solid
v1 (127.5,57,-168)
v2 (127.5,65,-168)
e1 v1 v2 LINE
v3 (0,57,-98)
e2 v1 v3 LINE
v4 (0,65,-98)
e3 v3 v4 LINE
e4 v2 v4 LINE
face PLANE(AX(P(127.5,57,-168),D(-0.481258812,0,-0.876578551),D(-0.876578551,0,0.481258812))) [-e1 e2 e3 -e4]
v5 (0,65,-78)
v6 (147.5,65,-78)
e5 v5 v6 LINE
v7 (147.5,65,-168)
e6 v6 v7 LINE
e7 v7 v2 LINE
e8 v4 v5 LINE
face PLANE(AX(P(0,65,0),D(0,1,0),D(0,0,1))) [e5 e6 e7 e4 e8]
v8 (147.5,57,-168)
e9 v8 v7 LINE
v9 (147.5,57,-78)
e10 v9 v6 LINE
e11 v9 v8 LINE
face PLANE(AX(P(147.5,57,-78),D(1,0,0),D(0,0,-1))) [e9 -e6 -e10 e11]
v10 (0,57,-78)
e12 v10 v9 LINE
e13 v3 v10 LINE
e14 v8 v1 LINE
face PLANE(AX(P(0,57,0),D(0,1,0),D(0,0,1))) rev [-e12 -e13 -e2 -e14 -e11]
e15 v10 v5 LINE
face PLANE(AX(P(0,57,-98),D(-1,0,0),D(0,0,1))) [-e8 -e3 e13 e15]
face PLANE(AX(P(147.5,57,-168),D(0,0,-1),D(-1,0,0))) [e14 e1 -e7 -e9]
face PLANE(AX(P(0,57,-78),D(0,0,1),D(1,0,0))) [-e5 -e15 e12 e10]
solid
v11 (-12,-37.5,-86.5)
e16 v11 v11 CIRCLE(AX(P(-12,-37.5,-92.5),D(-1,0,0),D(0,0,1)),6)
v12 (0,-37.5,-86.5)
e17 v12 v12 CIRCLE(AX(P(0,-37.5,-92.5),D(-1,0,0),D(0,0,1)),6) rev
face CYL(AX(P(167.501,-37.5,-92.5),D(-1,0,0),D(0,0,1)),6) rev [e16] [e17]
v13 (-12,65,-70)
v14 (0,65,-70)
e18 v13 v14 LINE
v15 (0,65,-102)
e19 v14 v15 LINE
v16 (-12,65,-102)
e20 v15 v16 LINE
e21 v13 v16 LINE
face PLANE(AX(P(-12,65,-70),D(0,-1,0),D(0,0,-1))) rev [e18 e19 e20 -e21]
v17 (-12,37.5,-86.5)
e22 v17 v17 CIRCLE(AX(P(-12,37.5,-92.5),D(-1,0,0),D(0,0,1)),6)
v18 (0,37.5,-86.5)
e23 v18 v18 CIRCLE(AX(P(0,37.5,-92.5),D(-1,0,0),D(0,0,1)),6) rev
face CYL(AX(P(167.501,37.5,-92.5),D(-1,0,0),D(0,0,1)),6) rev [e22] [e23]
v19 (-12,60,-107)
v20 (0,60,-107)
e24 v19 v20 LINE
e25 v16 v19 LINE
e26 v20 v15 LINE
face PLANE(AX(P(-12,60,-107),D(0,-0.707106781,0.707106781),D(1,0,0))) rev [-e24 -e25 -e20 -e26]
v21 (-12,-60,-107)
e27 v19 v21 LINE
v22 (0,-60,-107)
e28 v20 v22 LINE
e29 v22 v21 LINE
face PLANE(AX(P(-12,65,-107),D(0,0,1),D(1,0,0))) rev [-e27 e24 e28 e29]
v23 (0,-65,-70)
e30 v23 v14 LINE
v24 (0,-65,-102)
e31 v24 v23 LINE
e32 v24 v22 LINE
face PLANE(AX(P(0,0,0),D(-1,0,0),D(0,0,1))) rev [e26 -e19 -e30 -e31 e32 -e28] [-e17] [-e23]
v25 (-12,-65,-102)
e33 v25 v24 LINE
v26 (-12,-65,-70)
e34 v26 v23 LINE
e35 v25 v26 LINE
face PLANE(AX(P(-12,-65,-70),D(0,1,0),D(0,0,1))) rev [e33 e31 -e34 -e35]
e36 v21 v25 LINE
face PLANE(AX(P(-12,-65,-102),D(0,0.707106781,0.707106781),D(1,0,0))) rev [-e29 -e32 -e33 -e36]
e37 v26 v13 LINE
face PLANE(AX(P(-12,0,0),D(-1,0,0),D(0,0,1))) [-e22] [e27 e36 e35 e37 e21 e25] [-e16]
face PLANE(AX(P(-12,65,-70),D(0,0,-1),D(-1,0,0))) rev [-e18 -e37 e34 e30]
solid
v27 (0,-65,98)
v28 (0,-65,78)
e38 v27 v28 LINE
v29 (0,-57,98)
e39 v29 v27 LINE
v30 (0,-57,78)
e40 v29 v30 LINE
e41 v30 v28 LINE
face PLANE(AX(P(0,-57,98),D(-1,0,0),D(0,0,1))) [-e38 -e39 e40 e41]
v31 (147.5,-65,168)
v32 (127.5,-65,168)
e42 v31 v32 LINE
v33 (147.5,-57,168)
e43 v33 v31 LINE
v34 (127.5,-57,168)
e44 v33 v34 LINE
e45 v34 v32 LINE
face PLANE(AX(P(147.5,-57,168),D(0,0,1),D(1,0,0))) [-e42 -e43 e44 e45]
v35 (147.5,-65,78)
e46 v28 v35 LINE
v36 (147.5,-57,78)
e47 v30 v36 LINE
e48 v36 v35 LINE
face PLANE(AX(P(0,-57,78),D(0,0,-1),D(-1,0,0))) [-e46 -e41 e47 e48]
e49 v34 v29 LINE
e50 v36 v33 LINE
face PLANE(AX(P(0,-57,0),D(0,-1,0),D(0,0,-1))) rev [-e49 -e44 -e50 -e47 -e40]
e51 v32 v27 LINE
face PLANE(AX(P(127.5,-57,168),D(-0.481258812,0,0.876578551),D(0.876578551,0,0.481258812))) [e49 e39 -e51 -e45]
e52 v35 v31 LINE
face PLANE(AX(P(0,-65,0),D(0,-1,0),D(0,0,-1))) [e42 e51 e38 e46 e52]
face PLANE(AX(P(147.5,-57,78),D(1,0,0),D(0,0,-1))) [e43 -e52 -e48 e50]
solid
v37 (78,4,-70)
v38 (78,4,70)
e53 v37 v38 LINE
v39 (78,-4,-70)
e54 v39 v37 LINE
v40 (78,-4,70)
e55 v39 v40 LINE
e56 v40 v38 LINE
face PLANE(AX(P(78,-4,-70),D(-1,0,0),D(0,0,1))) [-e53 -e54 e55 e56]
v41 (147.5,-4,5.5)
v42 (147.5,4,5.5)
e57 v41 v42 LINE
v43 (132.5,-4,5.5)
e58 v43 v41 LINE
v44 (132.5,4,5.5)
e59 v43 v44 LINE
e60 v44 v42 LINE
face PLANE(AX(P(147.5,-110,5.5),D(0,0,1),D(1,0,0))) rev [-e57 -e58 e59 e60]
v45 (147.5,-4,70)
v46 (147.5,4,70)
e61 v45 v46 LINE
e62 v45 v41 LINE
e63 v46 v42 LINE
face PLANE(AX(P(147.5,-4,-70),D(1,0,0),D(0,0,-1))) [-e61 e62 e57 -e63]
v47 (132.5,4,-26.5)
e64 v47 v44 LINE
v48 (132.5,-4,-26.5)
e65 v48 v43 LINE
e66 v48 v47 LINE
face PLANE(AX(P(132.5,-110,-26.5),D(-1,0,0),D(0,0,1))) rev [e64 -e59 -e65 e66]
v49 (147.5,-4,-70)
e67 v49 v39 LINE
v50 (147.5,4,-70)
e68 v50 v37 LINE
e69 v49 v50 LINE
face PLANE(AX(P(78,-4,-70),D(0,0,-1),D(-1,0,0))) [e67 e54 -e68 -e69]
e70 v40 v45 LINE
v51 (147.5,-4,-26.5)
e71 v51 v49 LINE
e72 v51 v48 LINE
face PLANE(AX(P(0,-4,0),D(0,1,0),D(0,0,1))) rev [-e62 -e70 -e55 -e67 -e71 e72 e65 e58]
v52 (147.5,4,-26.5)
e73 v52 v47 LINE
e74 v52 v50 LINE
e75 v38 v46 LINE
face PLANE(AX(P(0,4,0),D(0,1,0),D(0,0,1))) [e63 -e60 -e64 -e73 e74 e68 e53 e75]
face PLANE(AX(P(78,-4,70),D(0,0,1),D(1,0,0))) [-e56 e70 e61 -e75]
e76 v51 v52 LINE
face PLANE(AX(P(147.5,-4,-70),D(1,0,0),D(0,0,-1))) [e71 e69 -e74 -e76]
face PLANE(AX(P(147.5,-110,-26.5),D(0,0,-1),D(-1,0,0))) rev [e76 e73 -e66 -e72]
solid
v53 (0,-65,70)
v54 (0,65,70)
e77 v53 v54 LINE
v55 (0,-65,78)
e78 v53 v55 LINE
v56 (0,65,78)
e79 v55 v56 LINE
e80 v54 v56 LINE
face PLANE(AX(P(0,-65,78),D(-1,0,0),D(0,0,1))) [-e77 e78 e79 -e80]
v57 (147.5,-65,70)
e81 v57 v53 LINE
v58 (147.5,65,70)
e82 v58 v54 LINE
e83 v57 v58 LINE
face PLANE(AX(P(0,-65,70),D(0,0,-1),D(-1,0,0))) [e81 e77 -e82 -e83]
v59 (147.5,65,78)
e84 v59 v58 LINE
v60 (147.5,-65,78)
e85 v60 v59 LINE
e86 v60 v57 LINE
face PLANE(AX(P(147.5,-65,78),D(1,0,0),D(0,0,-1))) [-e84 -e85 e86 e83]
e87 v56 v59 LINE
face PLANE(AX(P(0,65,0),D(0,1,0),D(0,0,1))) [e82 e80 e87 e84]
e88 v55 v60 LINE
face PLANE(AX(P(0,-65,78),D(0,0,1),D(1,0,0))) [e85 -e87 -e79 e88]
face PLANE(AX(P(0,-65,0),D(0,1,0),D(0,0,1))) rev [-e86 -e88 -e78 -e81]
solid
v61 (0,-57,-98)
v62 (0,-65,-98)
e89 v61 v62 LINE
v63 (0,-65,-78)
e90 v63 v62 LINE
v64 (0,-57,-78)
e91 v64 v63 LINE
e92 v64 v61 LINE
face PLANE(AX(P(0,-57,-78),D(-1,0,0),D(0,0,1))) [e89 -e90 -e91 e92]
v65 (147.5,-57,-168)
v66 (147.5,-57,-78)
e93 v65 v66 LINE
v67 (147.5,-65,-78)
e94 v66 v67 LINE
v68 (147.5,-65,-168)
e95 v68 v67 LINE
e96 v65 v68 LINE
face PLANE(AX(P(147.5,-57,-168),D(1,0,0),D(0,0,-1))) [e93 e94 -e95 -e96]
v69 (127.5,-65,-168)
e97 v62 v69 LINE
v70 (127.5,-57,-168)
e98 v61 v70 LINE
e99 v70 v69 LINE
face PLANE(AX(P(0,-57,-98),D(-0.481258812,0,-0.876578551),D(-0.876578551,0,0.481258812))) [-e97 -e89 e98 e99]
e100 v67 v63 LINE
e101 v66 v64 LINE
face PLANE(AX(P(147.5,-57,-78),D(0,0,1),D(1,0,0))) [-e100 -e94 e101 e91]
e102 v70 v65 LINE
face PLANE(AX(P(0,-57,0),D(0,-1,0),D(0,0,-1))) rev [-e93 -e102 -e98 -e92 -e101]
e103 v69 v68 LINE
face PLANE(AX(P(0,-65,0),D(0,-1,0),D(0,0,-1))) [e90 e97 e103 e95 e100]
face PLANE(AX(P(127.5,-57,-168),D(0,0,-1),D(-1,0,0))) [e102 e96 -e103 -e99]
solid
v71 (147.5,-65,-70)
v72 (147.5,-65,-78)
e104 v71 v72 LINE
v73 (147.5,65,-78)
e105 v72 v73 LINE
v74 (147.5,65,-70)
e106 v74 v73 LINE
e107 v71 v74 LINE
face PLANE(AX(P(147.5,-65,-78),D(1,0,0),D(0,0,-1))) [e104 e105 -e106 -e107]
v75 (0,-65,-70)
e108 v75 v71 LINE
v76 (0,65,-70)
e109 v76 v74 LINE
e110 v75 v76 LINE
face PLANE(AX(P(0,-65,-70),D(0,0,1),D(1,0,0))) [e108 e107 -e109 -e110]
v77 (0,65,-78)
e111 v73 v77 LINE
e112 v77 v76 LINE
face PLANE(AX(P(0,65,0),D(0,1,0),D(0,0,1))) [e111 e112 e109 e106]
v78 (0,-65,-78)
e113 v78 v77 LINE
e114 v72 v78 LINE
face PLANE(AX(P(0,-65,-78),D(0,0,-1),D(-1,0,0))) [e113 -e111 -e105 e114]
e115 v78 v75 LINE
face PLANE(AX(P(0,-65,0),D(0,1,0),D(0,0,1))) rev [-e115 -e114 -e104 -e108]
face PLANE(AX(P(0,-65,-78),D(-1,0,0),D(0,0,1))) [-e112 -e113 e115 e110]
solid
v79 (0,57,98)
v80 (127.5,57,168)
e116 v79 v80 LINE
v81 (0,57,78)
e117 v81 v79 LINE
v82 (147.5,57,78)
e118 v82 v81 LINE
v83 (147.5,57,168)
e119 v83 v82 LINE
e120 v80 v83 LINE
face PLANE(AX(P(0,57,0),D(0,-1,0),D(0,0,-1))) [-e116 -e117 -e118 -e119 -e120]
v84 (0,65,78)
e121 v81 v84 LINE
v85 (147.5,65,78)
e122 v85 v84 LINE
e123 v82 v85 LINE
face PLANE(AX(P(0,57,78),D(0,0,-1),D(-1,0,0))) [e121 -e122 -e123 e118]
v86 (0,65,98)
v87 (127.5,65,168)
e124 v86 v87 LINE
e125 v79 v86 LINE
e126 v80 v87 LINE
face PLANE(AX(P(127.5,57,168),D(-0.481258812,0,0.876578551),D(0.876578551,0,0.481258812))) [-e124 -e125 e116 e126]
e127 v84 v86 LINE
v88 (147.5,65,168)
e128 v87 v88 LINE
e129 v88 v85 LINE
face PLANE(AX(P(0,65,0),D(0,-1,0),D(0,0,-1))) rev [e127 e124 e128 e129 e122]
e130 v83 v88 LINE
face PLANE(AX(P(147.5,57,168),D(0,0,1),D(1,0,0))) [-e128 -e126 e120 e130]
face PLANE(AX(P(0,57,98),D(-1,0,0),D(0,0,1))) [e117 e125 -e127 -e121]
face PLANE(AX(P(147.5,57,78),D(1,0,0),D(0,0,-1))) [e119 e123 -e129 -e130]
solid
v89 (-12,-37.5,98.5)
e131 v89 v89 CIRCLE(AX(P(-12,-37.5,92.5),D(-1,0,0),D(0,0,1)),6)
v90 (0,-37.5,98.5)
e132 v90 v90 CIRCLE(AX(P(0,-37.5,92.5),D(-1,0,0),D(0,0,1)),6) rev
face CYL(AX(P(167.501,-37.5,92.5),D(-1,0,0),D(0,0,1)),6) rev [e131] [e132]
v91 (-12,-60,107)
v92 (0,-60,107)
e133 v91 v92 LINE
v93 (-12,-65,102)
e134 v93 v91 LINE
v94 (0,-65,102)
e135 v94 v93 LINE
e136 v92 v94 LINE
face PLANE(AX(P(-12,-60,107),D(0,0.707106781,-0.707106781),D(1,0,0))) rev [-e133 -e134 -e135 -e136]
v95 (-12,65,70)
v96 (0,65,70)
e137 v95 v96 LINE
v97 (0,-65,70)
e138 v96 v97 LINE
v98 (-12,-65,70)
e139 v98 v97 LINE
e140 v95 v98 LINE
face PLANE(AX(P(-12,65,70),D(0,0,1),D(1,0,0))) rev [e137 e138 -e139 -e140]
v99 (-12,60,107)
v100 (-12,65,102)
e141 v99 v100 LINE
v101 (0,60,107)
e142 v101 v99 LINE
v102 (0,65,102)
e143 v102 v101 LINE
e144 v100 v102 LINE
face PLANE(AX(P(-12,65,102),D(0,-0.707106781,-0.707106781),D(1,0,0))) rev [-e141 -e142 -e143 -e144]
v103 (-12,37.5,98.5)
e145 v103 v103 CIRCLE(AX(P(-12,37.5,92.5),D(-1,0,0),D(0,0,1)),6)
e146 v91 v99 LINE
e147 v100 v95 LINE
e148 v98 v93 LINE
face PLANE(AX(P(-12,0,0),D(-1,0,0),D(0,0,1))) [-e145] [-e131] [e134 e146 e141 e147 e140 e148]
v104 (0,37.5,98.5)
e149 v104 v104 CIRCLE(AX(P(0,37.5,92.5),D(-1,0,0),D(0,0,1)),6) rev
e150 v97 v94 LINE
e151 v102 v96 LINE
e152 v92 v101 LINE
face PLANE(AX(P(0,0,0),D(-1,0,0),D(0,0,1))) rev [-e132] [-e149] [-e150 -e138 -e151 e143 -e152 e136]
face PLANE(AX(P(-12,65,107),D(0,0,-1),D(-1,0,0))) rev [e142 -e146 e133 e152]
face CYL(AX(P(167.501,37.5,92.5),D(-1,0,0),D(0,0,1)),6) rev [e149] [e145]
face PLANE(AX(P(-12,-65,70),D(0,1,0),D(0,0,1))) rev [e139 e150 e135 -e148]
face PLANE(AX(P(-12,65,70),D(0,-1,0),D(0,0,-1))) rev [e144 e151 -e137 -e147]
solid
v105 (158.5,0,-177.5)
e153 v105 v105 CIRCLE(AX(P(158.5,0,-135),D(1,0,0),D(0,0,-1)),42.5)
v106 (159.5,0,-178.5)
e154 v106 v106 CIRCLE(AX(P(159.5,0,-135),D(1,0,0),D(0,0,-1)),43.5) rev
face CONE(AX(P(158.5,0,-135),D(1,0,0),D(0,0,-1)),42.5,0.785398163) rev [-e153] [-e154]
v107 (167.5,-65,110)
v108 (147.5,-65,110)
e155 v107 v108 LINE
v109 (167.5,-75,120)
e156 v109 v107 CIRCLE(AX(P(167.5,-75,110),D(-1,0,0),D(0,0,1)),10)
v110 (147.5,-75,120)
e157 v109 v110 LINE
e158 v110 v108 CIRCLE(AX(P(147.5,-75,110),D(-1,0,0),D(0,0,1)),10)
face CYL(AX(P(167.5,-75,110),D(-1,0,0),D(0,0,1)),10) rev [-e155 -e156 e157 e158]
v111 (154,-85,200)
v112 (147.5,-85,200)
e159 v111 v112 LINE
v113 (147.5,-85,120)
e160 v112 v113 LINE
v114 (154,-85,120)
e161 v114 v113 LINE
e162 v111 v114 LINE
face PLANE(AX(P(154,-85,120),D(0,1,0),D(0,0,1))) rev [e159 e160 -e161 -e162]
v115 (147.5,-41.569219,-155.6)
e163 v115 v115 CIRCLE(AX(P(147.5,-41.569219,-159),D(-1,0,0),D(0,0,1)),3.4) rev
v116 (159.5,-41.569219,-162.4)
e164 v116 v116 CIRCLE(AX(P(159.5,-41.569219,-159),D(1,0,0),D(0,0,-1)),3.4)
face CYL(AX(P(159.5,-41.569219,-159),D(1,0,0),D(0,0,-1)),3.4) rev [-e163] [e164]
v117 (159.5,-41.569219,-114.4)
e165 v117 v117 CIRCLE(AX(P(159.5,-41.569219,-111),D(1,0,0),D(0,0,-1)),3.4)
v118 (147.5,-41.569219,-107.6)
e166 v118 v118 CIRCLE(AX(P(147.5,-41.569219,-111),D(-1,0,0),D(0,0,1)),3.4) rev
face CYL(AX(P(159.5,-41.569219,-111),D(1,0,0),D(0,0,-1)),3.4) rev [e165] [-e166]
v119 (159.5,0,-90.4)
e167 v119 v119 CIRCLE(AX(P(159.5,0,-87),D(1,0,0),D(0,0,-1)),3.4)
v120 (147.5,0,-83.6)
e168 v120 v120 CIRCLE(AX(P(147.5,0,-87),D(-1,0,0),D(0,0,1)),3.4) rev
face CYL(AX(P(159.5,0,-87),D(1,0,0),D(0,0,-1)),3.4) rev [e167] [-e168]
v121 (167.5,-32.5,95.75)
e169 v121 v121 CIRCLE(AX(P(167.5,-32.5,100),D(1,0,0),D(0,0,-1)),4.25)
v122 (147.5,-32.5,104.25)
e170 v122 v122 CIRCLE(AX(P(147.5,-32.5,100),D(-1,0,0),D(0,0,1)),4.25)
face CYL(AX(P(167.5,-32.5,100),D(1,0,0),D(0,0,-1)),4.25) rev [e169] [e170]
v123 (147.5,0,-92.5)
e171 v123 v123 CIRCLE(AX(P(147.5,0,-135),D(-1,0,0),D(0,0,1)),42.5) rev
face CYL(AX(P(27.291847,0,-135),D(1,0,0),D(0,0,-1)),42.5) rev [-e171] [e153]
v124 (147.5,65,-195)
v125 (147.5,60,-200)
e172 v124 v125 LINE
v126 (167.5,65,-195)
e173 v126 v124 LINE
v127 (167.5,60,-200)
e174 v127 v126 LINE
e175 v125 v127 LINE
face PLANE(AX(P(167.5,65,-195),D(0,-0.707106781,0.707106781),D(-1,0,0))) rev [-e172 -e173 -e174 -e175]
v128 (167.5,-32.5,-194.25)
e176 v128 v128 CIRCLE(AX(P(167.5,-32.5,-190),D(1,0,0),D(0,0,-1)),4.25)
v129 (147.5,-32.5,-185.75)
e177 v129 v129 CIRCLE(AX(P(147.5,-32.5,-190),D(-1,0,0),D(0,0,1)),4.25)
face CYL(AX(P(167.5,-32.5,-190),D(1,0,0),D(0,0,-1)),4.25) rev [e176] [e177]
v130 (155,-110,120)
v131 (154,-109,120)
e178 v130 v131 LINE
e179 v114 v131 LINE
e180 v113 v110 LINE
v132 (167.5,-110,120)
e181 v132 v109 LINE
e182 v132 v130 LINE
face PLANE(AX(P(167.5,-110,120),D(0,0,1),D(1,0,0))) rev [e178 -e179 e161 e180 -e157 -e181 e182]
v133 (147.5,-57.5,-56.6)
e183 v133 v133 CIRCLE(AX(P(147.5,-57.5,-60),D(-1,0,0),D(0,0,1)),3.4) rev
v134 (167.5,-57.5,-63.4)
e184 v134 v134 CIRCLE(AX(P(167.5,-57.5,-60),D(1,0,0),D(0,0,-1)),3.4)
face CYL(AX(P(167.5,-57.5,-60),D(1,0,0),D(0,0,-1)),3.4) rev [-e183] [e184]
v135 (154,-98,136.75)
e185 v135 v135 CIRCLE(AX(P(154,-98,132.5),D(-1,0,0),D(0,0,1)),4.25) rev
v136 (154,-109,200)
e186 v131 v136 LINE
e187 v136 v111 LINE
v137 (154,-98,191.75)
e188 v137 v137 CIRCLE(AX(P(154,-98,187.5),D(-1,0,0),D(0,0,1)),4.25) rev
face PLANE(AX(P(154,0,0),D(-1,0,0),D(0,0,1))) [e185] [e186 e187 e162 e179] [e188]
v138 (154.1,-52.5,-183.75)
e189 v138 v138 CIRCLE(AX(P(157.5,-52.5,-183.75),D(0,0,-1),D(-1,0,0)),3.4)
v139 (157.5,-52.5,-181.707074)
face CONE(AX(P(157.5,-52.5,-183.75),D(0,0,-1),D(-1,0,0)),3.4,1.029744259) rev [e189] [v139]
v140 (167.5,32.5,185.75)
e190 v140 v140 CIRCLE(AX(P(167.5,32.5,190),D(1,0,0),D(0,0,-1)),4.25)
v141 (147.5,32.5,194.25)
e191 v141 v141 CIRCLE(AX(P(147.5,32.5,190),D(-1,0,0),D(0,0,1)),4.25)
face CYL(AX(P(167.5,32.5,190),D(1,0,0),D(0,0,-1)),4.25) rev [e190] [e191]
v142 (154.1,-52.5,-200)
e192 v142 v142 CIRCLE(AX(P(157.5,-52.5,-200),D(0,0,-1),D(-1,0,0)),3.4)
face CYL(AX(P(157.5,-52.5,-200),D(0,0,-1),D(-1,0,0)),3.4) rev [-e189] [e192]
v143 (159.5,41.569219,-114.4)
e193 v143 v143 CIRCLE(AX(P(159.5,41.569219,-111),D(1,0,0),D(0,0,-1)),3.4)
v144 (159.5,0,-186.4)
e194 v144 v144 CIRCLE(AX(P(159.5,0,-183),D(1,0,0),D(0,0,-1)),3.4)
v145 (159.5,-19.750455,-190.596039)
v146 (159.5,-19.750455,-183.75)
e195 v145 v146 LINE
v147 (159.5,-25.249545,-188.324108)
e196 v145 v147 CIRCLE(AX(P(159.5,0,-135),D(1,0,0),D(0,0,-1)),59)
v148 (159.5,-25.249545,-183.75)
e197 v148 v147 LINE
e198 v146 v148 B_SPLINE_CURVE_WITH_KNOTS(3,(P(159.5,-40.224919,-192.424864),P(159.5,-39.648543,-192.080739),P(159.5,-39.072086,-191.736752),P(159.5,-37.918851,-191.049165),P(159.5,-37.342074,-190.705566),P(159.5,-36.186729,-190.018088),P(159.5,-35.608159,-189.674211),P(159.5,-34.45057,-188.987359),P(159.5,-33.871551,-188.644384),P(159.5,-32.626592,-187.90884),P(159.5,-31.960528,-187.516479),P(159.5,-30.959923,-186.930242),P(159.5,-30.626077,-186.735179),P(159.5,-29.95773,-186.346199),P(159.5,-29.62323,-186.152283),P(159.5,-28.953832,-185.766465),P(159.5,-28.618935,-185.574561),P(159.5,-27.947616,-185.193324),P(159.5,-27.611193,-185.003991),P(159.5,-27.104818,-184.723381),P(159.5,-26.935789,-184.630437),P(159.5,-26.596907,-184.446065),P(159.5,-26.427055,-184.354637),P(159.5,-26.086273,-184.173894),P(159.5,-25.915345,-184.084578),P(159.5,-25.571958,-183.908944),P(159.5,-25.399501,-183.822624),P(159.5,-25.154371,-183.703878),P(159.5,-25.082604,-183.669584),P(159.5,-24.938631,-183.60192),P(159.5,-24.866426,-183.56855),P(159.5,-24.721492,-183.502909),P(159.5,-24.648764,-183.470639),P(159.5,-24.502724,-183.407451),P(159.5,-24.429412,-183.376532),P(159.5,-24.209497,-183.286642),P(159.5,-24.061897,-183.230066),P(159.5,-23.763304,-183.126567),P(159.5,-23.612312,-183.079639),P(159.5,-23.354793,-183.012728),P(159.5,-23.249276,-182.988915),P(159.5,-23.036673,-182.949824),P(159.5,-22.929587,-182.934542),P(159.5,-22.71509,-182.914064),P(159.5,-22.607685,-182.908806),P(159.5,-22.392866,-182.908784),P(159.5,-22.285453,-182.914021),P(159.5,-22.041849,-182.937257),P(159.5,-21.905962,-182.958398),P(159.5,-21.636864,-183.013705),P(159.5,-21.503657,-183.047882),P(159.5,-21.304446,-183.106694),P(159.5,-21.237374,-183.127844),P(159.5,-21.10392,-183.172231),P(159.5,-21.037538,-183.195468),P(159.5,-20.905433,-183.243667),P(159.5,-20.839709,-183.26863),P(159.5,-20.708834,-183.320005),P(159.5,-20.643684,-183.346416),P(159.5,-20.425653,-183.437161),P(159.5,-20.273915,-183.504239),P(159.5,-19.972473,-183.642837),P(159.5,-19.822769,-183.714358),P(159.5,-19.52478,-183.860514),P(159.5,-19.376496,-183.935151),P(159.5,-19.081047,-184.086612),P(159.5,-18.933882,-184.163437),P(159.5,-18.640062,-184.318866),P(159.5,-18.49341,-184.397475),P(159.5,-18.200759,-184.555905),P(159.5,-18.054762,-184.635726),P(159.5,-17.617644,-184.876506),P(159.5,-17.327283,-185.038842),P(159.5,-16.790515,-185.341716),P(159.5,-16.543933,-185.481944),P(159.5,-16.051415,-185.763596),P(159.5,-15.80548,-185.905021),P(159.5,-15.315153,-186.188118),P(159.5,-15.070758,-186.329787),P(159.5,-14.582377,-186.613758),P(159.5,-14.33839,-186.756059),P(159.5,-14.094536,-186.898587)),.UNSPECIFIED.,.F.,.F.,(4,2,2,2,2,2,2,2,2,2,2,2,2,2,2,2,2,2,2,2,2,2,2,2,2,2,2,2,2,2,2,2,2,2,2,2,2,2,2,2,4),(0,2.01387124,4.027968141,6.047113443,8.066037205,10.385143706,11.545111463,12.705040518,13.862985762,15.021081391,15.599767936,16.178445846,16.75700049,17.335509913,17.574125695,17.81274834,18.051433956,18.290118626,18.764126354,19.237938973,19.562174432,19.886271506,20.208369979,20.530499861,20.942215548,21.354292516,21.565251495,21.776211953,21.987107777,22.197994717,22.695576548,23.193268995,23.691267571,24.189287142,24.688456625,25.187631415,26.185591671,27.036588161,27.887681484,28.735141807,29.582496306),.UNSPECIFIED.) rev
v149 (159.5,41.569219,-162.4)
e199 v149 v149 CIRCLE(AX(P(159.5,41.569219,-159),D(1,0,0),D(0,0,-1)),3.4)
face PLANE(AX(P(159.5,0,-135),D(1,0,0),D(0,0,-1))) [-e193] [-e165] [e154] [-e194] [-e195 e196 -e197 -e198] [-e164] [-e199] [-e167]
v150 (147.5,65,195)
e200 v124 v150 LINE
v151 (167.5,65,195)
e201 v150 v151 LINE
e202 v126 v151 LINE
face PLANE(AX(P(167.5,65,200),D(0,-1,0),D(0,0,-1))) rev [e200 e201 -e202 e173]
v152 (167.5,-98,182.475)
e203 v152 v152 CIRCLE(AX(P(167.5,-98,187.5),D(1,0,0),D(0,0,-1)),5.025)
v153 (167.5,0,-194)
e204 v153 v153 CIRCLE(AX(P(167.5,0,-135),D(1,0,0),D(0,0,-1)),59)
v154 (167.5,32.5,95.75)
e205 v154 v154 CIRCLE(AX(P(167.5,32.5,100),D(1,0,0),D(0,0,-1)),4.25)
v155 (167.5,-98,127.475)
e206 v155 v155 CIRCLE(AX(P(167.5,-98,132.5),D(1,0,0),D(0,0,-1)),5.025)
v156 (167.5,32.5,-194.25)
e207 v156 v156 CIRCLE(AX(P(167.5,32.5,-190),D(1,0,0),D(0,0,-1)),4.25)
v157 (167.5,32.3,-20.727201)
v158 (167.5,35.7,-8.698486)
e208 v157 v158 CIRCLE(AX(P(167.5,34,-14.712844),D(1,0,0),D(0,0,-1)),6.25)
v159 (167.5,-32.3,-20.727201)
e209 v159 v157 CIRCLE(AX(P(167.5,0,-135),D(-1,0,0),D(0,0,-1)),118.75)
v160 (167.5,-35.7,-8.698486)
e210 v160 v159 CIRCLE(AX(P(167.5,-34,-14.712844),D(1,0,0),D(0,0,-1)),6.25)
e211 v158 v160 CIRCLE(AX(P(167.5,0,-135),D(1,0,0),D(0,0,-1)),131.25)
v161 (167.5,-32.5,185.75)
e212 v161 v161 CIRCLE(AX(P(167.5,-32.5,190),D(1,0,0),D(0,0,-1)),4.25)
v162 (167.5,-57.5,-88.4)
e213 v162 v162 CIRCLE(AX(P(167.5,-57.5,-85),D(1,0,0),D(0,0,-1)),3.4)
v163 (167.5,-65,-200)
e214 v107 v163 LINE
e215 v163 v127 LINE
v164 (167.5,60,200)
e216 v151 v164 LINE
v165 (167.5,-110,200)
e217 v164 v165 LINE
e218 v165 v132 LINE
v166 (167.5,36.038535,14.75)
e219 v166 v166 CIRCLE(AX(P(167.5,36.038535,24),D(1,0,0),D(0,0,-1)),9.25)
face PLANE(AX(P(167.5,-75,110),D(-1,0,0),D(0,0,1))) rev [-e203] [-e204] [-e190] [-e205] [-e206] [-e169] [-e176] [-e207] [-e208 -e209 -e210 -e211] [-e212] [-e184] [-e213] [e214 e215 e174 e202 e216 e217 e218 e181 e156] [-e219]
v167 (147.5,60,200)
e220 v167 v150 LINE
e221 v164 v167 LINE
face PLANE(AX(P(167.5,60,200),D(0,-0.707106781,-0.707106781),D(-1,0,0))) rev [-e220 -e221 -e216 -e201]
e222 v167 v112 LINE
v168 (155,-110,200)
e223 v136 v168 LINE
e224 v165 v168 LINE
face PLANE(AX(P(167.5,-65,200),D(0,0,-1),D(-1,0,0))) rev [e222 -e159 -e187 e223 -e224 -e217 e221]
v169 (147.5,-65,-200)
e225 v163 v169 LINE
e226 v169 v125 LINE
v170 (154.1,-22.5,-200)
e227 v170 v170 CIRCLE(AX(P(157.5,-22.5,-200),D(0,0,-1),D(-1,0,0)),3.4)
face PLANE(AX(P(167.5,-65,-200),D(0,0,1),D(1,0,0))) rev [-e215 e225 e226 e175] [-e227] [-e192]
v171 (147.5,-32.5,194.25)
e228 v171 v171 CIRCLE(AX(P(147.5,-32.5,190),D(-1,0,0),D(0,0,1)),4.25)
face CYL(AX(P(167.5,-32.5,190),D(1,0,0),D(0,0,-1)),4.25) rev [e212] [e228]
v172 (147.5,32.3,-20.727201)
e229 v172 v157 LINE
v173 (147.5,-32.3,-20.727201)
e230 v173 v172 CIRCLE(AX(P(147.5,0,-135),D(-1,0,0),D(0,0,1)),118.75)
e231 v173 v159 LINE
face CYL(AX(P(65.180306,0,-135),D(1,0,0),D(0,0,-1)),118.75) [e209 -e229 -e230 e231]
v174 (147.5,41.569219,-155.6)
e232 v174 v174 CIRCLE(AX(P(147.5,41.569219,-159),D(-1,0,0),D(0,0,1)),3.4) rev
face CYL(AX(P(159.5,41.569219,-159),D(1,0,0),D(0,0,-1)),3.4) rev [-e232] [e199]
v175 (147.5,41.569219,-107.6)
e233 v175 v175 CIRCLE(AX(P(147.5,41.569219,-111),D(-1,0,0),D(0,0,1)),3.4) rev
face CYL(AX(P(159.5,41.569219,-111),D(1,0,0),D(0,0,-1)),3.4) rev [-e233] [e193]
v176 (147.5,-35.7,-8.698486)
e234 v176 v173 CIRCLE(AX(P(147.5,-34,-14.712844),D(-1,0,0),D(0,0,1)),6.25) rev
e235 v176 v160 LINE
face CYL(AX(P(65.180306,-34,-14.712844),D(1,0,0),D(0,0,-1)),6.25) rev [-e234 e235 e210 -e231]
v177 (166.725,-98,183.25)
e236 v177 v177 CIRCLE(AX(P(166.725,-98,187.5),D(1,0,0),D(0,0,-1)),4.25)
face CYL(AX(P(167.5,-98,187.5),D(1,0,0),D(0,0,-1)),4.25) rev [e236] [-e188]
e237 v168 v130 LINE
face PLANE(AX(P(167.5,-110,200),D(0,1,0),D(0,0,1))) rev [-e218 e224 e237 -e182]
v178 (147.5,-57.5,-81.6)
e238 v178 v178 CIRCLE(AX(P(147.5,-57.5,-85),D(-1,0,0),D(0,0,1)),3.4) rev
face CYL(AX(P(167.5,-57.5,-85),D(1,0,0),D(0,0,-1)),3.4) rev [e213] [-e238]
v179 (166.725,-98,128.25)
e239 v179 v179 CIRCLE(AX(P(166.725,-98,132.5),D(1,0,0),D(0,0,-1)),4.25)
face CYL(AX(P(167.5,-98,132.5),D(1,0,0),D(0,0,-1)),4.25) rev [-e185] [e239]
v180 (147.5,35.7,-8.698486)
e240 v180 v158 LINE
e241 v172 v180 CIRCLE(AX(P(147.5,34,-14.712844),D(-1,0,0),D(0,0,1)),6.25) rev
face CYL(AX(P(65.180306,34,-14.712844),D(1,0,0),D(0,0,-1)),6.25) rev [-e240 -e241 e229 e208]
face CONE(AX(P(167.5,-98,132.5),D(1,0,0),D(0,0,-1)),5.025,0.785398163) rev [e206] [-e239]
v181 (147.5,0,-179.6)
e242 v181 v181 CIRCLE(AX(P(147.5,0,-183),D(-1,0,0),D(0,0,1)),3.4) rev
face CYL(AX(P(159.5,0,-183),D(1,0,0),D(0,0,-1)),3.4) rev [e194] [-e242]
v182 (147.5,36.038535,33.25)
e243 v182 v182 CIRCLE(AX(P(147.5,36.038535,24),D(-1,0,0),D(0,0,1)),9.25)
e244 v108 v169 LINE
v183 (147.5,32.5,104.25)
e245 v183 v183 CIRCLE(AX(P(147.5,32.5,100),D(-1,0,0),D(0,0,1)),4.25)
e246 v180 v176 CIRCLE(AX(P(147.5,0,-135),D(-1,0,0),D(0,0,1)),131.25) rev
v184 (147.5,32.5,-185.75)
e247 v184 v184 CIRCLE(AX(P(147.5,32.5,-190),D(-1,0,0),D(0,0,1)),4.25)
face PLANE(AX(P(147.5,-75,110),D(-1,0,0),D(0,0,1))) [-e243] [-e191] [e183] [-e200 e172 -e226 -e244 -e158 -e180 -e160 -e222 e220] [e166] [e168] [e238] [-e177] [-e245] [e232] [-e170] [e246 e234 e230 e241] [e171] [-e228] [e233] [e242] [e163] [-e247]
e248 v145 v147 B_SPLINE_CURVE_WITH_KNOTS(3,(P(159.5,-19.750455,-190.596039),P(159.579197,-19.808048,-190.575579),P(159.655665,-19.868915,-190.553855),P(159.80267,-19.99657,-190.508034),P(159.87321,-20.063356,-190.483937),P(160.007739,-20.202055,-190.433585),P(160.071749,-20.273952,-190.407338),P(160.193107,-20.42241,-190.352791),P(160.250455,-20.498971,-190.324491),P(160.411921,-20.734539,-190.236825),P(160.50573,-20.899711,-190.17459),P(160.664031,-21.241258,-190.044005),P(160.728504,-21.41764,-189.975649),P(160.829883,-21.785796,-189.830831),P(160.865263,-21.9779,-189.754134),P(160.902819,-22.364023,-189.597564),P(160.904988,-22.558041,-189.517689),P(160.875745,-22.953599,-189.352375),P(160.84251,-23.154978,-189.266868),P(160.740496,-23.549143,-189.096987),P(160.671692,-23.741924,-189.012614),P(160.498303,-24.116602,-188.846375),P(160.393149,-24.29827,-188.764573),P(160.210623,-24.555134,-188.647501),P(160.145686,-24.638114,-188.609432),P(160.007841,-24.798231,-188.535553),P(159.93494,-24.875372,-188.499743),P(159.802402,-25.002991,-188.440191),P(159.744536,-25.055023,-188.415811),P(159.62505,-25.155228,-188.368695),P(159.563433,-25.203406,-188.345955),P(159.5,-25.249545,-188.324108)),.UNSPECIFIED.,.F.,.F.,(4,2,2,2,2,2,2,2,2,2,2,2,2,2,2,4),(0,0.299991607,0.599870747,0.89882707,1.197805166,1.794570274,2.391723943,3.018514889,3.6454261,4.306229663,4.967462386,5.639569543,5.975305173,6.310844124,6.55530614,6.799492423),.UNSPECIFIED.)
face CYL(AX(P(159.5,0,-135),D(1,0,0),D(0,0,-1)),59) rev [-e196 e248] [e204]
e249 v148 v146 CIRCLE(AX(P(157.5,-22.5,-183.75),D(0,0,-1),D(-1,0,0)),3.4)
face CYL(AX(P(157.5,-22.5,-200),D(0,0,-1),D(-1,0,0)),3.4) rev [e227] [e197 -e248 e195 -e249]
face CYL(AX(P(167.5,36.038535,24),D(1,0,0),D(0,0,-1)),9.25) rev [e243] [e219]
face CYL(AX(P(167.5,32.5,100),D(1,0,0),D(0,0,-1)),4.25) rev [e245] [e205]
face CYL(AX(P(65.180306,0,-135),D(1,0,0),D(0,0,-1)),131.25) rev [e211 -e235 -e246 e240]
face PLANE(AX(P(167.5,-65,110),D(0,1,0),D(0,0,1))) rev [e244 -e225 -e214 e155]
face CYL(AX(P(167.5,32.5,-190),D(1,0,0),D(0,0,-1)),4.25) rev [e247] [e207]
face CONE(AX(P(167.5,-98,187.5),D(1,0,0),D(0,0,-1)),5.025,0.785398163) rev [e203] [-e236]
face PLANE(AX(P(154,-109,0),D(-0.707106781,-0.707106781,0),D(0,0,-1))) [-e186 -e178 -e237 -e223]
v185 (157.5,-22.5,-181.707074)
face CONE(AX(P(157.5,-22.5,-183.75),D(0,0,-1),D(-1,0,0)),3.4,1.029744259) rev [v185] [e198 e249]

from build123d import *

# Parameters (mm, degrees)
EXTRUDE_1_DEPTH              = 65
EXTRUDE_1_DEPTH_BACK         = 65
SKETCH_2_W                   = 147.5
SKETCH_2_H                   = 8
EXTRUDE_1_2_DEPTH            = 65
EXTRUDE_1_2_DEPTH_BACK       = 65
SKETCH_7_R                   = 2.5
EXTRUDE_6_DEPTH              = 20
SKETCH_8_W                   = 37
SKETCH_8_H                   = 130
EXTRUDE_7_DEPTH              = 12
EXTRUDE_7_2_DEPTH            = 12
CHAMFER_2_SIZE               = 5
CHAMFER_3_SIZE               = 5
SKETCH_12_R                  = 1
CUT_EXTRUDE_4_DEPTH          = 20
SKETCH_16_R                  = 6
CUT_EXTRUDE_8_DEPTH          = 12
SKETCH_11_R                  = 42.5
CUT_EXTRUDE_9_DEPTH          = 20
SKETCH_28_R                  = 59
SKETCH_28_R_2                = 42.5
CUT_EXTRUDE_11_DEPTH         = 8
HOLE_START                   = 147.5
HOLE_WIZARD_M8_4_OUTLINE_R   = 3.4
HOLE_WIZARD_M8_4_DEPTH       = 12
CUT_EXTRUDE_12_DEPTH         = 20
EXTRUDE_12_DEPTH             = 4
EXTRUDE_12_DEPTH_BACK        = 4
SKETCH_33_W                  = 69.5
SKETCH_33_H                  = 140
SKETCH_34_W                  = 15
SKETCH_34_H                  = 32
CUT_EXTRUDE_13_DEPTH         = 285.69676851
EXTRUDE_13_DEPTH             = 8
EXTRUDE_13_2_DEPTH           = 8
EXTRUDE_14_DEPTH             = 8
EXTRUDE_14_2_DEPTH           = 8
CHAMFER_4_SIZE               = 5
SKETCH_40_W                  = 4.25
SKETCH_40_H                  = 179.5
HOLE_WIZARD_M10_1_AT_2_COUNT = 2
HOLE_WIZARD_M10_1_AT_2_PITCH = 65
HOLE_WIZARD_M10_1_AT_3_COUNT = 2
HOLE_WIZARD_M10_1_AT_3_PITCH = 385.519130524
HOLE_WIZARD_M10_1_AT_4_COUNT = 2
HOLE_WIZARD_M10_1_AT_4_PITCH = 380
HOLE_WIZARD_M10_1_AT_5_COUNT = 2
HOLE_WIZARD_M10_1_AT_5_PITCH = 90
HOLE_WIZARD_M10_1_AT_6_COUNT = 2
HOLE_WIZARD_M10_1_AT_6_PITCH = 111.018016556
SKETCH_45_R                  = 6
CUT_EXTRUDE_14_DEPTH         = 291.379493078
HOLE_WIZARD_M8_5_OUTLINE_R   = 3.4
HOLE_WIZARD_M8_5_DEPTH       = 20
HOLE_WIZARD_M8_6_AT_2_COUNT  = 2
HOLE_WIZARD_M8_6_AT_2_PITCH  = 30
CHAMFER_5_SIZE               = 1
HOLE_WIZARD_M10_2_AT_2_COUNT = 2
HOLE_WIZARD_M10_2_AT_2_PITCH = 55
SKETCH_56_W                  = 80
SKETCH_56_H                  = 25
CUT_EXTRUDE_15_DEPTH         = 6.5
CHAMFER_6_SIZE               = 1


# Read off the part's stored shape, not the designer's step: M8 螺纹孔4, M8 螺纹孔5
with BuildPart() as part:
    # 草图2 → 凸台-拉伸1 (new, two sides: drawn at the far end of the back side and taken through both)
    with BuildSketch(Plane(origin=(0, 0, 0), x_dir=(1, 0, 0), z_dir=(0, 1, 0)).offset(-EXTRUDE_1_DEPTH_BACK)):
        with Locations((73.75, -74)):
            Rectangle(SKETCH_2_W, SKETCH_2_H)
    extrude(amount=EXTRUDE_1_DEPTH + EXTRUDE_1_DEPTH_BACK)


with BuildPart() as body_2:
    # 草图2 → Extrude 1 2 (new, two sides: drawn at the far end of the back side and taken through both)
    with BuildSketch(Plane(origin=(0, 0, 0), x_dir=(1, 0, 0), z_dir=(0, 1, 0)).offset(-EXTRUDE_1_2_DEPTH_BACK)):
        with Locations((73.75, 74)):
            Rectangle(SKETCH_2_W, SKETCH_2_H)
    extrude(amount=EXTRUDE_1_2_DEPTH + EXTRUDE_1_2_DEPTH_BACK)


with BuildPart() as body_3:
    # 草图7 → 凸台-拉伸6 (new body)
    with BuildSketch(Plane(origin=(147.5, 0, 0), x_dir=(0, 0, -1), z_dir=(1, 0, 0))):
        with BuildLine():
            Line((-110, -65), (200, -65))
            Line((200, -65), (200, 65))
            Line((200, 65), (-200, 65))
            Line((-200, 65), (-200, -65))
            Line((-200, -65), (-200, -110))
            Line((-200, -110), (-120, -110))
            Line((-120, -110), (-120, -75))
            ThreePointArc((-120, -75), (-117.071067812, -67.928932188), (-110, -65))
        make_face()
        with Locations((-187.5, -98)):
            Circle(SKETCH_7_R, mode=Mode.SUBTRACT)
        with Locations((-132.5, -98)):
            Circle(SKETCH_7_R, mode=Mode.SUBTRACT)
    extrude(amount=EXTRUDE_6_DEPTH)

    # 草图12 → 切除-拉伸4 (cut)
    with BuildSketch(Plane(origin=(167.5, 0, 0), x_dir=(0, 0, -1), z_dir=(1, 0, 0))):
        with Locations((-190, 32.5)):
            Circle(SKETCH_12_R)
        with Locations((-190, -32.5)):
            Circle(SKETCH_12_R)
        with Locations((-100, 32.5)):
            Circle(SKETCH_12_R)
        with Locations((-100, -32.5)):
            Circle(SKETCH_12_R)
    extrude(amount=-CUT_EXTRUDE_4_DEPTH, mode=Mode.SUBTRACT)

    # 草图11 → 切除-拉伸9 (cut)
    with BuildSketch(Plane(origin=(167.5, 0, 0), x_dir=(0, 0, -1), z_dir=(1, 0, 0))):
        with Locations((135, 0)):
            Circle(SKETCH_11_R)
    extrude(amount=-CUT_EXTRUDE_9_DEPTH, mode=Mode.SUBTRACT)

    # 草图28 → 切除-拉伸11 (cut)
    with BuildSketch(Plane(origin=(167.5, 0, 0), x_dir=(0, 0, -1), z_dir=(1, 0, 0))):
        with Locations((135, 0)):
            Circle(SKETCH_28_R)
        with Locations((135, 0)):
            Circle(SKETCH_28_R_2, mode=Mode.SUBTRACT)
    extrude(amount=-CUT_EXTRUDE_11_DEPTH, mode=Mode.SUBTRACT)

    # M8 螺纹孔4 outline → M8 螺纹孔4 (cut)
    with BuildSketch(Plane.YZ.offset(HOLE_START)):
        with Locations((-41.569219382, -159)):
            Circle(HOLE_WIZARD_M8_4_OUTLINE_R)
        with Locations((-41.569219382, -111)):
            Circle(HOLE_WIZARD_M8_4_OUTLINE_R)
        with Locations((0, -87)):
            Circle(HOLE_WIZARD_M8_4_OUTLINE_R)
        with Locations((41.569219382, -111)):
            Circle(HOLE_WIZARD_M8_4_OUTLINE_R)
        with Locations((41.569219382, -159)):
            Circle(HOLE_WIZARD_M8_4_OUTLINE_R)
        with Locations((0, -183)):
            Circle(HOLE_WIZARD_M8_4_OUTLINE_R)
    extrude(amount=HOLE_WIZARD_M8_4_DEPTH, mode=Mode.SUBTRACT)

    # 草图26 → 切除-拉伸12 (cut)
    with BuildSketch(Plane(origin=(167.5, 0, 0), x_dir=(0, 0, -1), z_dir=(1, 0, 0))):
        with BuildLine():
            ThreePointArc((8.698485757, 35.7), (3.75, 0), (8.698485757, -35.7))
            ThreePointArc((8.698485757, -35.7), (16.412843578, -40.014357821), (20.727201399, -32.3))
            ThreePointArc((20.727201399, -32.3), (16.25, 0), (20.727201399, 32.3))
            ThreePointArc((20.727201399, 32.3), (16.412843578, 40.014357821), (8.698485757, 35.7))
        make_face()
    extrude(amount=-CUT_EXTRUDE_12_DEPTH, mode=Mode.SUBTRACT)

    # 倒角4
    chamfer_4_edges = [body_3.edges().sort_by_distance(p)[0] for p in [
        (157.5, 65, 200),
        (157.5, 65, -200),
    ]]
    chamfer(chamfer_4_edges, length=CHAMFER_4_SIZE)

    # 草图40 → M10 螺纹孔1 (revolve, cut)
    with BuildSketch(Plane(origin=(167.5, 32.5, 190), x_dir=(0, 0, -1), z_dir=(0, 1, 0))):
        with Locations((2.125, 89.75)):
            Rectangle(SKETCH_40_W, SKETCH_40_H)
    hole_wizard_m10_1 = revolve(axis=Axis((173.85, 32.5, 190), (-1, 0, 0)), mode=Mode.SUBTRACT)

    # M10 螺纹孔1 at 2: M10 螺纹孔1 ×2
    with Locations(*[(0, -i * HOLE_WIZARD_M10_1_AT_2_PITCH, 0) for i in range(1, HOLE_WIZARD_M10_1_AT_2_COUNT)]):
        add(hole_wizard_m10_1, mode=Mode.SUBTRACT)

    # M10 螺纹孔1 at 3: M10 螺纹孔1 ×2
    with Locations(*[Vector(0, -0.16860382495583923, -0.9856838997418294) * (i * HOLE_WIZARD_M10_1_AT_3_PITCH) for i in range(1, HOLE_WIZARD_M10_1_AT_3_COUNT)]):
        add(hole_wizard_m10_1, mode=Mode.SUBTRACT)

    # M10 螺纹孔1 at 4: M10 螺纹孔1 ×2
    with Locations(*[(0, 0, -i * HOLE_WIZARD_M10_1_AT_4_PITCH) for i in range(1, HOLE_WIZARD_M10_1_AT_4_COUNT)]):
        add(hole_wizard_m10_1, mode=Mode.SUBTRACT)

    # M10 螺纹孔1 at 5: M10 螺纹孔1 ×2
    with Locations(*[(0, 0, -i * HOLE_WIZARD_M10_1_AT_5_PITCH) for i in range(1, HOLE_WIZARD_M10_1_AT_5_COUNT)]):
        add(hole_wizard_m10_1, mode=Mode.SUBTRACT)

    # M10 螺纹孔1 at 6: M10 螺纹孔1 ×2
    with Locations(*[Vector(0, -0.5854905538443586, -0.810679228399881) * (i * HOLE_WIZARD_M10_1_AT_6_PITCH) for i in range(1, HOLE_WIZARD_M10_1_AT_6_COUNT)]):
        add(hole_wizard_m10_1, mode=Mode.SUBTRACT)

    # 草图45 → 切除-拉伸14 (cut, through all)
    with BuildSketch(Plane(origin=(167.5, 0, 0), x_dir=(0, 0, -1), z_dir=(1, 0, 0))):
        with Locations((-24, 36.038535167)):
            Circle(SKETCH_45_R)
    extrude(amount=-CUT_EXTRUDE_14_DEPTH, mode=Mode.SUBTRACT)

    # M8 螺纹孔5 outline → M8 螺纹孔5 (cut)
    with BuildSketch(Plane.YZ.offset(HOLE_START)):
        with Locations((-57.5, -85)):
            Circle(HOLE_WIZARD_M8_5_OUTLINE_R)
        with Locations((-57.5, -60)):
            Circle(HOLE_WIZARD_M8_5_OUTLINE_R)
    extrude(amount=HOLE_WIZARD_M8_5_DEPTH, mode=Mode.SUBTRACT)

    # 草图51 → M20x1.5 螺纹孔1 (revolve, cut)
    with BuildSketch(Plane(origin=(167.5, 36.038535167, 24), x_dir=(0, 0, -1), z_dir=(0, 1, 0))):
        Polygon((0, 0), (0, 53.057960726), (9.25, 47.5), (9.25, 0), align=None)
    revolve(axis=Axis((173.85, 36.038535167, 24), (-1, 0, 0)), mode=Mode.SUBTRACT)

    # 草图49 → M8 螺纹孔6 (revolve, cut)
    with BuildSketch(Plane(origin=(157.5, -22.5, -200), x_dir=(0, 1, 0), z_dir=(1, 0, 0))):
        Polygon((0, 0), (0, 18.292926105), (3.4, 16.25), (3.4, 0), align=None)
    hole_wizard_m8_6 = revolve(axis=Axis((157.5, -22.5, -206.35), (0, 0, 1)), mode=Mode.SUBTRACT)

    # M8 螺纹孔6 at 2: M8 螺纹孔6 ×2
    with Locations(*[(0, -i * HOLE_WIZARD_M8_6_AT_2_PITCH, 0) for i in range(1, HOLE_WIZARD_M8_6_AT_2_COUNT)]):
        add(hole_wizard_m8_6, mode=Mode.SUBTRACT)

    # 倒角5
    chamfer_5_edges = [body_3.edges().sort_by_distance(p)[0] for p in [
        (159.5, 0, -92.5),
    ]]
    chamfer(chamfer_5_edges, length=CHAMFER_5_SIZE)

    # 草图54 → M10 螺纹孔2 (revolve, cut)
    with BuildSketch(Plane(origin=(167.5, -98, 187.5), x_dir=(0, 0, -1), z_dir=(0, 1, 0))):
        Polygon((0, 0), (0, 179.5), (4.25, 179.5), (4.25, 0.775), (5.025, 0), align=None)
    hole_wizard_m10_2 = revolve(axis=Axis((173.85, -98, 187.5), (-1, 0, 0)), mode=Mode.SUBTRACT)

    # M10 螺纹孔2 at 2: M10 螺纹孔2 ×2
    with Locations(*[(0, 0, -i * HOLE_WIZARD_M10_2_AT_2_PITCH) for i in range(1, HOLE_WIZARD_M10_2_AT_2_COUNT)]):
        add(hole_wizard_m10_2, mode=Mode.SUBTRACT)

    # 草图56 → 切除-拉伸15 (cut)
    with BuildSketch(Plane.ZY.offset(-147.5)):
        with Locations((160, -97.5)):
            Rectangle(SKETCH_56_W, SKETCH_56_H)
    extrude(amount=-CUT_EXTRUDE_15_DEPTH, mode=Mode.SUBTRACT)

    # 倒角6
    chamfer_6_edges = [body_3.edges().sort_by_distance(p)[0] for p in [
        (154, -110, 160),
    ]]
    chamfer(chamfer_6_edges, length=CHAMFER_6_SIZE)


with BuildPart() as body_4:
    # 草图8 → 凸台-拉伸7 (new body)
    with BuildSketch(Plane.ZY):
        with Locations((88.5, 0)):
            Rectangle(SKETCH_8_W, SKETCH_8_H)
    extrude(amount=EXTRUDE_7_DEPTH)

    # 倒角2
    chamfer_2_edges = [body_4.edges().sort_by_distance(p)[0] for p in [
        (-6, 65, 107),
        (-6, -65, 107),
    ]]
    chamfer(chamfer_2_edges, length=CHAMFER_2_SIZE)


with BuildPart() as body_5:
    # 草图8 → Extrude 7 2 (new body)
    with BuildSketch(Plane.ZY):
        with Locations((-88.5, 0)):
            Rectangle(SKETCH_8_W, SKETCH_8_H)
    extrude(amount=EXTRUDE_7_2_DEPTH)

    # 倒角3
    chamfer_3_edges = [body_5.edges().sort_by_distance(p)[0] for p in [
        (-6, -65, -107),
        (-6, 65, -107),
    ]]
    chamfer(chamfer_3_edges, length=CHAMFER_3_SIZE)


with BuildPart() as cut_extrude_8_tool:
    # 草图16 → 切除-拉伸8 (new body)
    with BuildSketch(Plane.ZY.offset(12)):
        with Locations((-92.5, 37.5)):
            Circle(SKETCH_16_R)
        with Locations((92.5, 37.5)):
            Circle(SKETCH_16_R)
        with Locations((92.5, -37.5)):
            Circle(SKETCH_16_R)
        with Locations((-92.5, -37.5)):
            Circle(SKETCH_16_R)
    extrude(amount=-CUT_EXTRUDE_8_DEPTH)


with BuildPart() as body_4_1:
    add(body_4.part)

    # 切除-拉伸8: cut by cut_extrude_8_tool
    add(cut_extrude_8_tool.part, mode=Mode.SUBTRACT)


with BuildPart() as body_5_1:
    add(body_5.part)

    # 切除-拉伸8: cut by cut_extrude_8_tool
    add(cut_extrude_8_tool.part, mode=Mode.SUBTRACT)


with BuildPart() as body_6:
    # 草图33 → 凸台-拉伸12 (new, two sides: drawn at the far end of the back side and taken through both)
    with BuildSketch(Plane(origin=(0, 0, 0), x_dir=(1, 0, 0), z_dir=(0, 1, 0)).offset(-EXTRUDE_12_DEPTH_BACK)):
        with Locations((112.75, 0)):
            Rectangle(SKETCH_33_W, SKETCH_33_H)
    extrude(amount=EXTRUDE_12_DEPTH + EXTRUDE_12_DEPTH_BACK)

    # 草图34 → 切除-拉伸13 (cut, through all)
    with BuildSketch(Plane(origin=(0, 4, 0), x_dir=(1, 0, 0), z_dir=(0, 1, 0))):
        with Locations((140, 10.5)):
            Rectangle(SKETCH_34_W, SKETCH_34_H)
    extrude(amount=-CUT_EXTRUDE_13_DEPTH, mode=Mode.SUBTRACT)


with BuildPart() as body_7:
    # 草图36 → 凸台-拉伸13 (new body)
    with BuildSketch(Plane(origin=(0, 65, 0), x_dir=(1, 0, 0), z_dir=(0, 1, 0))):
        Polygon((0, 78), (147.5, 78), (147.5, 168), (127.5, 168), (0, 98), align=None)
    extrude(amount=-EXTRUDE_13_DEPTH)


with BuildPart() as body_8:
    # 草图36 → Extrude 13 2 (new body)
    with BuildSketch(Plane(origin=(0, 65, 0), x_dir=(1, 0, 0), z_dir=(0, 1, 0))):
        Polygon((0, -98), (0, -78), (147.5, -78), (147.5, -168), (127.5, -168), align=None)
    extrude(amount=-EXTRUDE_13_2_DEPTH)


with BuildPart() as body_9:
    # 草图37 → 凸台-拉伸14 (new body)
    with BuildSketch(Plane.XZ.offset(65)):
        Polygon((127.5, 168), (0, 98), (0, 78), (147.5, 78), (147.5, 168), align=None)
    extrude(amount=-EXTRUDE_14_DEPTH)


with BuildPart() as body_10:
    # 草图37 → Extrude 14 2 (new body)
    with BuildSketch(Plane.XZ.offset(65)):
        Polygon((0, -78), (0, -98), (127.5, -168), (147.5, -168), (147.5, -78), align=None)
    extrude(amount=-EXTRUDE_14_2_DEPTH)


solid = Compound([part.part, body_2.part, body_3.part, body_4_1.part, body_5_1.part, body_6.part, body_7.part, body_8.part, body_9.part, body_10.part])
